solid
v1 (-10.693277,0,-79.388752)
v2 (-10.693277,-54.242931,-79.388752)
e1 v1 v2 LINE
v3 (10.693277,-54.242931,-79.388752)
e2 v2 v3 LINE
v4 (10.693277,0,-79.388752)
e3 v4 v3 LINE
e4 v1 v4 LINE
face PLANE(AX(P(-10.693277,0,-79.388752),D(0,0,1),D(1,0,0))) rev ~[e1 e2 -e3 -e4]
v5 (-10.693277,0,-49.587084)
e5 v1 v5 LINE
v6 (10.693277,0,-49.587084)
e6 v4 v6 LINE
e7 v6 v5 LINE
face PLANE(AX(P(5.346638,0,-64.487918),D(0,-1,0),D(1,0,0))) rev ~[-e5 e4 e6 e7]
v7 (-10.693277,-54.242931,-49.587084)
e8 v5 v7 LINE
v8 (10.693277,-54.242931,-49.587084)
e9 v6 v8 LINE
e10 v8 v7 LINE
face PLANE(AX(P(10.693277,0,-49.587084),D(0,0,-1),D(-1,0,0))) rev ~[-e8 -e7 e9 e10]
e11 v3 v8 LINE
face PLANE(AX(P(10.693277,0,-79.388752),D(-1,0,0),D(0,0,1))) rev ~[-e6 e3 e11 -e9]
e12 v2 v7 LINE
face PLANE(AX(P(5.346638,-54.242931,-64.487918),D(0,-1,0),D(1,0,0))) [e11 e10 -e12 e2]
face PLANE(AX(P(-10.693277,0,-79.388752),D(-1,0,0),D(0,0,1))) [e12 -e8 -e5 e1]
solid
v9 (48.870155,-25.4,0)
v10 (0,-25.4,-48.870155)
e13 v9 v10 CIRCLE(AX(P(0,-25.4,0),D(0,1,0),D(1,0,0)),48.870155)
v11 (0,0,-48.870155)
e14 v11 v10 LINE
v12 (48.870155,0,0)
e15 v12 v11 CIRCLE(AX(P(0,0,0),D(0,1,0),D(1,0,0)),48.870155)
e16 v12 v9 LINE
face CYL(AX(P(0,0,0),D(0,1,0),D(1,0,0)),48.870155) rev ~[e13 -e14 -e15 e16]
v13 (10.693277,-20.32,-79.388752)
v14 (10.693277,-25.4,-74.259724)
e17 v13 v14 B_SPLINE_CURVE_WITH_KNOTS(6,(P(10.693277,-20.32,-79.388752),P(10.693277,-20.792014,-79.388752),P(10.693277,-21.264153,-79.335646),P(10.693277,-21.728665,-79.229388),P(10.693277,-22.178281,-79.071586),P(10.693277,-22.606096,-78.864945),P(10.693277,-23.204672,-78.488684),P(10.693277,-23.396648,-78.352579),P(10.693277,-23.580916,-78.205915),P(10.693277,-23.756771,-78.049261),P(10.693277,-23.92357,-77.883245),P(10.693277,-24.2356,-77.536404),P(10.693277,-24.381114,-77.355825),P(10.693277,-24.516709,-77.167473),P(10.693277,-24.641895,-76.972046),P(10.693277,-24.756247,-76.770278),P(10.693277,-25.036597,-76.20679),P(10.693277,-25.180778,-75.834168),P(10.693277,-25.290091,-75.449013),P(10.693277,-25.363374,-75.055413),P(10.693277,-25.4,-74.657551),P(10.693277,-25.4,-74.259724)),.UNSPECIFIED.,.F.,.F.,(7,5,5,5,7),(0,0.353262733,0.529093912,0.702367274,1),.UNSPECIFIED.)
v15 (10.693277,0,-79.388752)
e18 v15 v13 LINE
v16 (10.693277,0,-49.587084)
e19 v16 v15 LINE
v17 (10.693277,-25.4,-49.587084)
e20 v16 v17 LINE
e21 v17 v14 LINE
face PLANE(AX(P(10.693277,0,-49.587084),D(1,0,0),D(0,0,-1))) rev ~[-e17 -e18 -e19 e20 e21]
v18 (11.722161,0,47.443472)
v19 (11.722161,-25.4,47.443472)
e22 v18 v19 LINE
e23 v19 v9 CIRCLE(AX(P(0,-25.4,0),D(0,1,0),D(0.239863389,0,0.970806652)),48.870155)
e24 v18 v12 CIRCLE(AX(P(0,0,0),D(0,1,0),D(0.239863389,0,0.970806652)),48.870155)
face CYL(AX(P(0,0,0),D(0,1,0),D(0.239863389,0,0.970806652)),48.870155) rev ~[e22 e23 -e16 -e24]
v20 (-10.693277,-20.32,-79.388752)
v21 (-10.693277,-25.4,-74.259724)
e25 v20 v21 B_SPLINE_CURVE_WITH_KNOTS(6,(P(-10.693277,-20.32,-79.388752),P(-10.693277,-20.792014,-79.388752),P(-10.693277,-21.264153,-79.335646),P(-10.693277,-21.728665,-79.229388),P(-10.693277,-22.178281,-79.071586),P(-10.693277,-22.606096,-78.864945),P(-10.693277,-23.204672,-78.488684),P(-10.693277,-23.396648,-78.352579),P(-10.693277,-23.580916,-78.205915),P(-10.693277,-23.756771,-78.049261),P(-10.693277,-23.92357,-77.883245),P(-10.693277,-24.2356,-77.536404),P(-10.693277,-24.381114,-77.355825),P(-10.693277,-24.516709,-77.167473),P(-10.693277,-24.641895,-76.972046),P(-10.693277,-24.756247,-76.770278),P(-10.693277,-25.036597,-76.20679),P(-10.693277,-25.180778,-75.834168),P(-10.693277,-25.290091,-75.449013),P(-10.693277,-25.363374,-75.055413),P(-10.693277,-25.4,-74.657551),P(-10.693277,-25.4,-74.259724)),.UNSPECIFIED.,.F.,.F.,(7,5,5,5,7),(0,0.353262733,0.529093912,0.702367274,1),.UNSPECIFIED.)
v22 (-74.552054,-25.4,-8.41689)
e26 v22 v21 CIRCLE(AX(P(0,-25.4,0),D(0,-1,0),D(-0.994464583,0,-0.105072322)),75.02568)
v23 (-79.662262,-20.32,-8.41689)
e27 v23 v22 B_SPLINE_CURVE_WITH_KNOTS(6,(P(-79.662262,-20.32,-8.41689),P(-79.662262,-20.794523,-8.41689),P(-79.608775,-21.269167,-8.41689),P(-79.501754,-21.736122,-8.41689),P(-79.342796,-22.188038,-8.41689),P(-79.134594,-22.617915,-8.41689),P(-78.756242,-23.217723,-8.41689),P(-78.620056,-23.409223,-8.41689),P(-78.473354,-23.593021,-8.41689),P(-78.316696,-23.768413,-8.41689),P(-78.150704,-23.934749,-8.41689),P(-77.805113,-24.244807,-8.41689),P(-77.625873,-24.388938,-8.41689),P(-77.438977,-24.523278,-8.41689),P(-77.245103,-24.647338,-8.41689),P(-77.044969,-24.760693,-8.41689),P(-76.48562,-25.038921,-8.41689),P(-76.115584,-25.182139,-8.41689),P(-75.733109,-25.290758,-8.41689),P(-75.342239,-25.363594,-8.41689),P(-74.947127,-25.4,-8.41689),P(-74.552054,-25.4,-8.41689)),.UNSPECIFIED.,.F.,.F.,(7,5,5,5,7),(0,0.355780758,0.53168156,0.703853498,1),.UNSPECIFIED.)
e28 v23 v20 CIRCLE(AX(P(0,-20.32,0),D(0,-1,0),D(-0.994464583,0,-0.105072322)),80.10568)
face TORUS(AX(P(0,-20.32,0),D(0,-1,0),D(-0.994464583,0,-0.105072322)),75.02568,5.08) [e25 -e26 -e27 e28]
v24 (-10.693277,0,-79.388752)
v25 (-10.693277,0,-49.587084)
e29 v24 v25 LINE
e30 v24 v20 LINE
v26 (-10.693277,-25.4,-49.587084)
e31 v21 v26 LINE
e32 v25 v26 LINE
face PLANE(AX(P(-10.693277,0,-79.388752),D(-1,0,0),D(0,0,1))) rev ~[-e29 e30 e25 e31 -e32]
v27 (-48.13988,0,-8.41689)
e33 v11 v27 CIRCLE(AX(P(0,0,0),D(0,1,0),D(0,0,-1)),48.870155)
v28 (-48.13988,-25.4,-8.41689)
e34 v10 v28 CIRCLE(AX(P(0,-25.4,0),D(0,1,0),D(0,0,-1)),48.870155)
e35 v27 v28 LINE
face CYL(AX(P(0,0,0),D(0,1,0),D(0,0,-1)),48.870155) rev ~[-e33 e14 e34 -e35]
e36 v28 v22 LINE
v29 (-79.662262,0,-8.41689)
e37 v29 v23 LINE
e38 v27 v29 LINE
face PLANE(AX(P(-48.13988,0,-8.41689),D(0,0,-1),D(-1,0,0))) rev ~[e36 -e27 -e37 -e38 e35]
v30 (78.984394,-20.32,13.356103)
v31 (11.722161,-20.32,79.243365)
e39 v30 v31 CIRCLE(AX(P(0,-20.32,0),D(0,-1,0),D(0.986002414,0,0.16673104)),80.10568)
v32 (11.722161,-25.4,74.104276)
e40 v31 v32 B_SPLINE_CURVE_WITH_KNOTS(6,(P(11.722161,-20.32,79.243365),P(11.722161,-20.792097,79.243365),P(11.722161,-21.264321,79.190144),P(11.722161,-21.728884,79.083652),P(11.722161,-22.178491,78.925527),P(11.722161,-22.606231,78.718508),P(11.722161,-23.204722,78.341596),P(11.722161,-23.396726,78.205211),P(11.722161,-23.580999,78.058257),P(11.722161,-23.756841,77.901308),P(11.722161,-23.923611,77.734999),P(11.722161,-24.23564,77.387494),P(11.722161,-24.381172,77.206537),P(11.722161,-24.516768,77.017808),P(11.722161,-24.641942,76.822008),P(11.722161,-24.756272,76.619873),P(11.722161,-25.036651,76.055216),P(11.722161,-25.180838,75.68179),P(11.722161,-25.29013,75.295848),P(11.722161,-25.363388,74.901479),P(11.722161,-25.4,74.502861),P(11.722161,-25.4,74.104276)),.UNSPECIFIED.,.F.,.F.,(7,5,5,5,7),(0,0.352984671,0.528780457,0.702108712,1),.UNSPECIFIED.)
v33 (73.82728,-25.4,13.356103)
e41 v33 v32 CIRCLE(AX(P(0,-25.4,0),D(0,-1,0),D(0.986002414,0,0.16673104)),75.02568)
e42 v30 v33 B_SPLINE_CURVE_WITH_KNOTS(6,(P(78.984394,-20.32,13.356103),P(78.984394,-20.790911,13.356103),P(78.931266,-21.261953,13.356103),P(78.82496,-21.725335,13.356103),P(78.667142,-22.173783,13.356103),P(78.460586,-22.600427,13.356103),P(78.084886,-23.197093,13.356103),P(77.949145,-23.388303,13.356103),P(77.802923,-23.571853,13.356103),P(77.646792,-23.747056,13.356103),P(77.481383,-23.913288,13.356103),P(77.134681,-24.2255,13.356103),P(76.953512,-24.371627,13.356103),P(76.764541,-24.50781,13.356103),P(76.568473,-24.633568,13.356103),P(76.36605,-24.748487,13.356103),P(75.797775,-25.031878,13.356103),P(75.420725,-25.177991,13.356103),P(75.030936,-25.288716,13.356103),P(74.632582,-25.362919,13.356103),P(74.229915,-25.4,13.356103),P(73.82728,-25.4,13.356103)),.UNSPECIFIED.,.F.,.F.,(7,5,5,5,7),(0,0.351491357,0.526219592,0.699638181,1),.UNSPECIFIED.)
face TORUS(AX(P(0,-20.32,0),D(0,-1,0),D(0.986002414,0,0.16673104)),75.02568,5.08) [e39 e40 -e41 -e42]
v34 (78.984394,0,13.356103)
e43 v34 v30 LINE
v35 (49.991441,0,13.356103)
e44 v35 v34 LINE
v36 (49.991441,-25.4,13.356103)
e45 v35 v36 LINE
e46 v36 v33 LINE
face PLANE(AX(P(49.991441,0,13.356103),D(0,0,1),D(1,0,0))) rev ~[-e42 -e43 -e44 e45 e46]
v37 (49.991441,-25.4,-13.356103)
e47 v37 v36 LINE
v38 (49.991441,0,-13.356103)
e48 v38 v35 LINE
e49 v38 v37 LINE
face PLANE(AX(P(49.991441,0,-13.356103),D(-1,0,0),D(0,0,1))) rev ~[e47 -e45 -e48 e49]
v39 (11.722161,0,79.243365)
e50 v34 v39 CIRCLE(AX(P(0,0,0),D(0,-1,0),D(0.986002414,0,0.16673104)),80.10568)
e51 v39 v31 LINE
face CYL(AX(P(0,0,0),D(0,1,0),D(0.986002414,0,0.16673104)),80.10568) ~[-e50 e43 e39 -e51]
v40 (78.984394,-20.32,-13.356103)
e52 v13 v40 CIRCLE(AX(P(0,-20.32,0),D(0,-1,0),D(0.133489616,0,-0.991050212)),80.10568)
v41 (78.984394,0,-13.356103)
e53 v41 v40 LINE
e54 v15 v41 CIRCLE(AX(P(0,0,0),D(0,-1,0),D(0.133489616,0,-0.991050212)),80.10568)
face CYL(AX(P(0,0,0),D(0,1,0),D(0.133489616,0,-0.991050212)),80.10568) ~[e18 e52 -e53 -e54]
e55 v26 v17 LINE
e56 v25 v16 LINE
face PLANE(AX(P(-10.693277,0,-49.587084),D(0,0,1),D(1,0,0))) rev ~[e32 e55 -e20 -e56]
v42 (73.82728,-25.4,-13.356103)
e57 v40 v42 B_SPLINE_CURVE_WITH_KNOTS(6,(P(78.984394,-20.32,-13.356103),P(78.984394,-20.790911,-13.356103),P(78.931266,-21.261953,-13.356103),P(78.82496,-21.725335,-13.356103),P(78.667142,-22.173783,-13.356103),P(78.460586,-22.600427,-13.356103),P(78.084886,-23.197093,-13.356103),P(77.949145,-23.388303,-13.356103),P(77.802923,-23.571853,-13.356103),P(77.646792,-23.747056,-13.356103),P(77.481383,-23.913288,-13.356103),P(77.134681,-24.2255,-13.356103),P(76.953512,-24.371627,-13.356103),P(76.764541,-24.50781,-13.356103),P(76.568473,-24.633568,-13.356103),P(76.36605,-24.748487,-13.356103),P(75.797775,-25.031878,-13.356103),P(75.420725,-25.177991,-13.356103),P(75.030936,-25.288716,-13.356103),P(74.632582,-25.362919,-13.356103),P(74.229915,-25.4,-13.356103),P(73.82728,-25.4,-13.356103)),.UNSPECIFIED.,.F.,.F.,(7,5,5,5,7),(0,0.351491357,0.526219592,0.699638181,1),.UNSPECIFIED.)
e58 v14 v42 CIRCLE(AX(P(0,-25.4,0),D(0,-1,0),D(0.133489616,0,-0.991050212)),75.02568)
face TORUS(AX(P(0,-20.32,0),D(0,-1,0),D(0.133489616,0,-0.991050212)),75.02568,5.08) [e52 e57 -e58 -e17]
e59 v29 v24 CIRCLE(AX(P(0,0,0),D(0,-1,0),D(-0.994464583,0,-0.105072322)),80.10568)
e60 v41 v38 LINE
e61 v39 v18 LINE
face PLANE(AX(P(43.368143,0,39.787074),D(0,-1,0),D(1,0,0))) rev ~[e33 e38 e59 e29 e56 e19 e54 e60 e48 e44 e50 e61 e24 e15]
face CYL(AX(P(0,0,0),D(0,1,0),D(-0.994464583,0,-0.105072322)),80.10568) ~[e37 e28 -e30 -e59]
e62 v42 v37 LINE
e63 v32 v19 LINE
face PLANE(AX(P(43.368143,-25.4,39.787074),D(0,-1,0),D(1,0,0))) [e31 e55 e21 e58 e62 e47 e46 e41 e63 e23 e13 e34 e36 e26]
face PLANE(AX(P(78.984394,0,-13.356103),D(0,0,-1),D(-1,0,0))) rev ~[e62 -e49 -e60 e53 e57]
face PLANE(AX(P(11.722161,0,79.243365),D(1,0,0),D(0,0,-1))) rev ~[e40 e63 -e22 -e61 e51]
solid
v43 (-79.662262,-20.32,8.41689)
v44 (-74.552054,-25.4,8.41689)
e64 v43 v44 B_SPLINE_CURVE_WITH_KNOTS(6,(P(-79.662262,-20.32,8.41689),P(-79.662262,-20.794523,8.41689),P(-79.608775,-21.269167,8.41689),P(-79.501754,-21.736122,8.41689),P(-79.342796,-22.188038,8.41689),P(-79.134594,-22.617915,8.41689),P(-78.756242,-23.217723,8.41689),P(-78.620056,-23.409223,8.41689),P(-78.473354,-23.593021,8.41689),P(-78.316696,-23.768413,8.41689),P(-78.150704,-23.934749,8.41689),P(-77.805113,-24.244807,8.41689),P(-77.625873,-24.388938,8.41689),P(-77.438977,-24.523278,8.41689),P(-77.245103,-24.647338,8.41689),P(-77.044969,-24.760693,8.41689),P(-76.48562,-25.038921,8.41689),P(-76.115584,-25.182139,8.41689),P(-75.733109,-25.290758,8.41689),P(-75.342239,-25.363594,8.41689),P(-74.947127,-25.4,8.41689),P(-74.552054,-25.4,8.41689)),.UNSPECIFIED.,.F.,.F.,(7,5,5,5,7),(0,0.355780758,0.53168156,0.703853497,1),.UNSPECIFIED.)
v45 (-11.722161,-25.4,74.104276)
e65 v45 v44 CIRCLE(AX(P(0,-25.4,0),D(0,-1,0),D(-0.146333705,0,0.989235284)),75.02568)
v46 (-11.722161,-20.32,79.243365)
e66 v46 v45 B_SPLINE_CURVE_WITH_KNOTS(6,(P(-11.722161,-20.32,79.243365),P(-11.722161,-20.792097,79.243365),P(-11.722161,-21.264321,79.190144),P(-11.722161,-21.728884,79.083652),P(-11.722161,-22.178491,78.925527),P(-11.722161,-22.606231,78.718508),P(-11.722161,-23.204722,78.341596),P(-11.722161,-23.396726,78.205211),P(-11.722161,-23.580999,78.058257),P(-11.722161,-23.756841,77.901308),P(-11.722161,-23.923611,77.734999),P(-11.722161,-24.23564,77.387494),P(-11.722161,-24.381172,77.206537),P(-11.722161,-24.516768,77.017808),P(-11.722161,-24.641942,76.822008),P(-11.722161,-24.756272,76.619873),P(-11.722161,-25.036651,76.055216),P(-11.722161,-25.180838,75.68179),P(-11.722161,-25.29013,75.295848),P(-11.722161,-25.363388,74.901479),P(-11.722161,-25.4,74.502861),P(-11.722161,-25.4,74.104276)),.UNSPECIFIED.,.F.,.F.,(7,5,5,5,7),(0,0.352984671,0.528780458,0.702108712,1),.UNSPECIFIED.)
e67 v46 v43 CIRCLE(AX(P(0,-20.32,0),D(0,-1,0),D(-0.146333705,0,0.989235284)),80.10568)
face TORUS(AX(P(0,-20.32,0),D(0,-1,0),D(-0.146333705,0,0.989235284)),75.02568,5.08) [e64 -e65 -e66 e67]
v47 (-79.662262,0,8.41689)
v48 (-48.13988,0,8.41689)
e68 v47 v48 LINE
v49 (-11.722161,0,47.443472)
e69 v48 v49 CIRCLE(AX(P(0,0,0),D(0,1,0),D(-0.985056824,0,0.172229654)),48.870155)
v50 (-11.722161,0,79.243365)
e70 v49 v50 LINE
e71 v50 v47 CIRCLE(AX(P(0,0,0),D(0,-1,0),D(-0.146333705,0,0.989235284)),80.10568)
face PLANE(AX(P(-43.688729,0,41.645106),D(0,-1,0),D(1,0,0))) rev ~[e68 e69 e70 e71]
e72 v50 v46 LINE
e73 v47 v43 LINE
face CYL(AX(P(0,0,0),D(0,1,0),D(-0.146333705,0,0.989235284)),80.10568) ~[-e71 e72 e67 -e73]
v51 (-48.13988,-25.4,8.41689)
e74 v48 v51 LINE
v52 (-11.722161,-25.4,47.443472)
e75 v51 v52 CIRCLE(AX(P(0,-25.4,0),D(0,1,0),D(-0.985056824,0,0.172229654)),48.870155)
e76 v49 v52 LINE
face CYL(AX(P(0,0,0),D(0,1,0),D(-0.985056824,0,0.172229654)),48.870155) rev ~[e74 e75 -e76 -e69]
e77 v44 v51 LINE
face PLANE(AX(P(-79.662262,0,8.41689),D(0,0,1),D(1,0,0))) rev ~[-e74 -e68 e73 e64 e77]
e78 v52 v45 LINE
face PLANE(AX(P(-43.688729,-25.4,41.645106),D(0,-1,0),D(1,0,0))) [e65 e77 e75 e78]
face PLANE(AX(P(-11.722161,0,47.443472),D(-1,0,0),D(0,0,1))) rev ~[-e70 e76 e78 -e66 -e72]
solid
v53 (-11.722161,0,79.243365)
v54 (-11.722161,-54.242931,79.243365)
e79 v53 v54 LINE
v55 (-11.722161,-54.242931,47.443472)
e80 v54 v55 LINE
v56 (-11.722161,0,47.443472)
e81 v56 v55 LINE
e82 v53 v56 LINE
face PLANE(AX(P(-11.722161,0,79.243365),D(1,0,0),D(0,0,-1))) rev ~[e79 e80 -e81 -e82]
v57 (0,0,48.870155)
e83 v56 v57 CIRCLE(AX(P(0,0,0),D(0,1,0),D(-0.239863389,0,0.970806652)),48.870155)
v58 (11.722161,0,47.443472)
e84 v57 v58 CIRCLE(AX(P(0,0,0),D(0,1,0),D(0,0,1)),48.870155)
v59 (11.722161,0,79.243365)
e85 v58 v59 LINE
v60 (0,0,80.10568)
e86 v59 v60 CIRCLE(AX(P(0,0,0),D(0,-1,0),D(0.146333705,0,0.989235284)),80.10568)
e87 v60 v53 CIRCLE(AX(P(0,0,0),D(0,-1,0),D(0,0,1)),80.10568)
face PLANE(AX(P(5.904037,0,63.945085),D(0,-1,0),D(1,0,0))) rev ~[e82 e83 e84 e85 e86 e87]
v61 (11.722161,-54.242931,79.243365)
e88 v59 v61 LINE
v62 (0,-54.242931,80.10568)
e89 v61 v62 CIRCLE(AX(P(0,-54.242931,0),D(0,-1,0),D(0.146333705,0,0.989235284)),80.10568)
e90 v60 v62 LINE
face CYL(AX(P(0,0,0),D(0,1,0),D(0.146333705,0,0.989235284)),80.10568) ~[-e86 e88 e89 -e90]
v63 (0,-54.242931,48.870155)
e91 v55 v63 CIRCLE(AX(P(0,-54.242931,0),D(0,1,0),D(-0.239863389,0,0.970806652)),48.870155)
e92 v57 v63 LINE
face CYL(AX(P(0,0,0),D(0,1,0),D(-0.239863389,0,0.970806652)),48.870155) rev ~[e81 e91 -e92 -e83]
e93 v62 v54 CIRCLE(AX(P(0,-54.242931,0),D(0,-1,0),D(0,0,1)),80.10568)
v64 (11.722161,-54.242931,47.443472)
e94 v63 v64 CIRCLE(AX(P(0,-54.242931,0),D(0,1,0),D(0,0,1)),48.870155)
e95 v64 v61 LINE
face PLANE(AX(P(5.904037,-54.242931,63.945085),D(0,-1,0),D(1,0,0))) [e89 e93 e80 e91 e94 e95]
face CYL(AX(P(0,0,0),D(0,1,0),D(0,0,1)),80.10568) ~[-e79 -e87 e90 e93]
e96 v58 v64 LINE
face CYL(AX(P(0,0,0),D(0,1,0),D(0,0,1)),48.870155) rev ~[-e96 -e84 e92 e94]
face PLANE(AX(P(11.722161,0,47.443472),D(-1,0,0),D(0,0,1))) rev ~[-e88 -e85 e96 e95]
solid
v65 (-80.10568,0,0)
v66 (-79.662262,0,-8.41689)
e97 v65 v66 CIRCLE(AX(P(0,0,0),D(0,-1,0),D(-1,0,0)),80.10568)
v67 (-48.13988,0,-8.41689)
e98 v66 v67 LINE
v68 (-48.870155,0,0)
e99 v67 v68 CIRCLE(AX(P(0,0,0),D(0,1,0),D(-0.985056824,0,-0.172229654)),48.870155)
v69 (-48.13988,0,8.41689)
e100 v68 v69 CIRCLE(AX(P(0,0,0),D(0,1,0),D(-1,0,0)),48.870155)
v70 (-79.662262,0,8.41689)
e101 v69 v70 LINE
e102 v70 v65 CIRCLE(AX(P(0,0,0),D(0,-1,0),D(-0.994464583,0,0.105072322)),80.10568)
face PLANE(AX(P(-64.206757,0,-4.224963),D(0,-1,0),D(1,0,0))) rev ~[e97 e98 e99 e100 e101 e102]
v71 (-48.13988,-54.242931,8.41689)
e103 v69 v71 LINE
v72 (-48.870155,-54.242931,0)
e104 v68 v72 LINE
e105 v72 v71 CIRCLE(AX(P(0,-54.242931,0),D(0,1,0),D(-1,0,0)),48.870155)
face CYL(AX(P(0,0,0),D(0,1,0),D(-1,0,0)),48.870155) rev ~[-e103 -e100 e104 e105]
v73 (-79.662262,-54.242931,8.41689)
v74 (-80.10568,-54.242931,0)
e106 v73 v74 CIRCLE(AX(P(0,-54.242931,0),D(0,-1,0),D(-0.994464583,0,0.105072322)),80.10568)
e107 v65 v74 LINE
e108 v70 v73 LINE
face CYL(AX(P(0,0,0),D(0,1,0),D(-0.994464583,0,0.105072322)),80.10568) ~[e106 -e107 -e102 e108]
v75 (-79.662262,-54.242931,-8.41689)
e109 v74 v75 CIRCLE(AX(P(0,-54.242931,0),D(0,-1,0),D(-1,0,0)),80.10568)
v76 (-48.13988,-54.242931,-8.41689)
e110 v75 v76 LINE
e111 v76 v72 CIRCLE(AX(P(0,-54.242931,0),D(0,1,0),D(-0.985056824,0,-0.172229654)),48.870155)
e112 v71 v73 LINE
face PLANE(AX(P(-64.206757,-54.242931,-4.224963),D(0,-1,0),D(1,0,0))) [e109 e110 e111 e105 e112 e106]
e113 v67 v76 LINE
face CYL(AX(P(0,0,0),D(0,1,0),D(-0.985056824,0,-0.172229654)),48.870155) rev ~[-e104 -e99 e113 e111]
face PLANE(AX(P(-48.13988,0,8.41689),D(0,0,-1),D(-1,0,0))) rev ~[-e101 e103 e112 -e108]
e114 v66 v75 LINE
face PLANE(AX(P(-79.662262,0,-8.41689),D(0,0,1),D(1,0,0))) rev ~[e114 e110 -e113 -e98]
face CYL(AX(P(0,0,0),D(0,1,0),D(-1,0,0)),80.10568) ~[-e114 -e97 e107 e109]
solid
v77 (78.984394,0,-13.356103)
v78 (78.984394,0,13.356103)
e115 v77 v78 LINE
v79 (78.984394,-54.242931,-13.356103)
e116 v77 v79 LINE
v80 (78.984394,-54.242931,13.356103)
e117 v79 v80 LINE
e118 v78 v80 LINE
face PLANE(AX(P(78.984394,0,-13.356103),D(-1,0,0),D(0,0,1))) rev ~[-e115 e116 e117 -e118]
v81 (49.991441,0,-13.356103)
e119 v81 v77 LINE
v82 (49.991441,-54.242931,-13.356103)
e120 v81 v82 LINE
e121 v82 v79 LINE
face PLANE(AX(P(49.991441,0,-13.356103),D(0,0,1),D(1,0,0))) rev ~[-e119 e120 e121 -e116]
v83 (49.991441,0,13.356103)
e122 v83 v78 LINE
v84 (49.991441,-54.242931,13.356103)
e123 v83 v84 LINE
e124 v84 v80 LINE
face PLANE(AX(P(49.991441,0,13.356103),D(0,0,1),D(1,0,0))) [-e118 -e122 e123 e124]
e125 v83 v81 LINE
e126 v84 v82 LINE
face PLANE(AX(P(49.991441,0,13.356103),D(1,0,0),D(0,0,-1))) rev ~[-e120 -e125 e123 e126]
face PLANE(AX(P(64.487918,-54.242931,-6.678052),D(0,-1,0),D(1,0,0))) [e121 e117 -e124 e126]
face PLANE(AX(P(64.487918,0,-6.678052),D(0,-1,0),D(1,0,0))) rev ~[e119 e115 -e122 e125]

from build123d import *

# Parameters (mm, degrees)
F1_DEPTH = 25.4
F2_DEPTH = 54.2429313064
F0_W     = 28.9929530091
F0_H     = 13.3561033948
F0_W_2   = 10.6932765457
F0_H_2   = 29.8016675711
F3_R     = 5.08
F3_2_R   = 5.08


with BuildPart() as f1:
    # F0 (on Front) → F1 (new body)
    with BuildSketch(Plane.XZ):
        with BuildLine():
            ThreePointArc((11.7221610006, 47.4434716165), (38.4782788305, 30.1282942728), (48.8701550801, 0))
            Line((48.8701550801, 0), (49.9914412338, 0))
            Line((49.9914412338, 0), (49.9914412338, 13.3561033948))
            Line((49.9914412338, 13.3561033948), (78.9843942429, 13.3561033948))
            ThreePointArc((78.9843942429, 13.3561033948), (56.055353156, 57.2251466959), (11.7221610006, 79.2433654844))
            Line((11.7221610006, 79.2433654844), (11.7221610006, 47.4434716165))
        make_face()
        with BuildLine():
            Line((49.9914412338, 0), (48.8701550801, 0))
            ThreePointArc((48.8701550801, 0), (34.5564180548, -34.5564180548), (0, -48.8701550801))
            Line((0, -48.8701550801), (0, -49.5870839528))
            Line((0, -49.5870839528), (10.6932765457, -49.5870839528))
            Line((10.6932765457, -49.5870839528), (10.6932765457, -79.3887515239))
            ThreePointArc((10.6932765457, -79.3887515239), (55.6830208794, -57.5875092148), (78.9843942429, -13.3561033948))
            Line((78.9843942429, -13.3561033948), (49.9914412338, -13.3561033948))
            Line((49.9914412338, -13.3561033948), (49.9914412338, 0))
        make_face()
        with BuildLine():
            Line((0, -49.5870839528), (0, -48.8701550801))
            ThreePointArc((0, -48.8701550801), (-31.4400806584, -37.4140800468), (-48.1398797488, -8.4168898844))
            Line((-48.1398797488, -8.4168898844), (-79.6622620598, -8.4168898844))
            ThreePointArc((-79.6622620598, -8.4168898844), (-57.4480819986, -55.8268564984), (-10.6932765457, -79.3887515239))
            Line((-10.6932765457, -79.3887515239), (-10.6932765457, -49.5870839528))
            Line((-10.6932765457, -49.5870839528), (0, -49.5870839528))
        make_face()
    extrude(amount=F1_DEPTH)

    # F3
    f3_edges = [f1.edges().sort_by_distance(p)[0] for p in [
        (-57.448082, -25.4, -55.826856),
        (56.055353, -25.4, 57.225147),
        (55.683021, -25.4, -57.587509),
    ]]
    fillet(f3_edges, radius=F3_R)


with BuildPart() as f1b:
    # F0 (on Front) → F1, piece 2 (new body)
    with BuildSketch(Plane.XZ):
        with BuildLine():
            ThreePointArc((-48.1398797488, 8.4168898844), (-35.7300224054, 33.341529006), (-11.7221610006, 47.4434716165))
            Line((-11.7221610006, 47.4434716165), (-11.7221610006, 79.2433654844))
            ThreePointArc((-11.7221610006, 79.2433654844), (-57.8089578353, 55.4530831047), (-79.6622620598, 8.4168898844))
            Line((-79.6622620598, 8.4168898844), (-48.1398797488, 8.4168898844))
        make_face()
    extrude(amount=F1_DEPTH)

    # F3#2
    f3_2_edges = [f1b.edges().sort_by_distance(p)[0] for p in [
        (-57.808958, -25.4, 55.453083),
    ]]
    fillet(f3_2_edges, radius=F3_2_R)


with BuildPart() as f2:
    # F0 (on Front) → F2 (new body)
    with BuildSketch(Plane.XZ):
        with BuildLine():
            ThreePointArc((0, 48.8701550801), (5.9043307036, 48.5121730754), (11.7221610006, 47.4434716165))
            Line((11.7221610006, 47.4434716165), (11.7221610006, 79.2433654844))
            ThreePointArc((11.7221610006, 79.2433654844), (5.8769176771, 79.8898108048), (0, 80.1056803967))
            Line((0, 80.1056803967), (0, 48.8701550801))
        make_face()
        with BuildLine():
            ThreePointArc((-11.7221610006, 47.4434716165), (-5.9043307036, 48.5121730754), (0, 48.8701550801))
            Line((0, 48.8701550801), (0, 80.1056803967))
            ThreePointArc((0, 80.1056803967), (-5.8769176771, 79.8898108048), (-11.7221610006, 79.2433654844))
            Line((-11.7221610006, 79.2433654844), (-11.7221610006, 47.4434716165))
        make_face()
    extrude(amount=F2_DEPTH)


with BuildPart() as f2b:
    # F0 (on Front) → F2, piece 2 (new body)
    with BuildSketch(Plane.XZ):
        with Locations((64.4879177384, -6.6780516974)):
            Rectangle(F0_W, F0_H)
        with Locations((64.4879177384, 6.6780516974)):
            Rectangle(F0_W, F0_H)
    extrude(amount=F2_DEPTH)


with BuildPart() as f2c:
    # F0 (on Front) → F2, piece 3 (new body)
    with BuildSketch(Plane.XZ):
        with BuildLine():
            Line((-79.6622620598, -8.4168898844), (-48.1398797488, -8.4168898844))
            ThreePointArc((-48.1398797488, -8.4168898844), (-48.6872439475, -4.2242554783), (-48.8701550801, 0))
            Line((-48.8701550801, 0), (-80.1056803967, 0))
            ThreePointArc((-80.1056803967, 0), (-79.9947490028, -4.2142809335), (-79.6622620598, -8.4168898844))
        make_face()
        with BuildLine():
            ThreePointArc((-48.8701550801, 0), (-48.6872439475, 4.2242554783), (-48.1398797488, 8.4168898844))
            Line((-48.1398797488, 8.4168898844), (-79.6622620598, 8.4168898844))
            ThreePointArc((-79.6622620598, 8.4168898844), (-79.9947490028, 4.2142809335), (-80.1056803967, 0))
            Line((-80.1056803967, 0), (-48.8701550801, 0))
        make_face()
    extrude(amount=F2_DEPTH)


with BuildPart() as f2d:
    # F0 (on Front) → F2, piece 4 (new body)
    with BuildSketch(Plane.XZ):
        with Locations((5.3466382728, -64.4879177384)):
            Rectangle(F0_W_2, F0_H_2)
        with Locations((-5.3466382728, -64.4879177384)):
            Rectangle(F0_W_2, F0_H_2)
    extrude(amount=F2_DEPTH)


solid = Compound([f1.part, f1b.part, f2.part, f2b.part, f2c.part, f2d.part])
